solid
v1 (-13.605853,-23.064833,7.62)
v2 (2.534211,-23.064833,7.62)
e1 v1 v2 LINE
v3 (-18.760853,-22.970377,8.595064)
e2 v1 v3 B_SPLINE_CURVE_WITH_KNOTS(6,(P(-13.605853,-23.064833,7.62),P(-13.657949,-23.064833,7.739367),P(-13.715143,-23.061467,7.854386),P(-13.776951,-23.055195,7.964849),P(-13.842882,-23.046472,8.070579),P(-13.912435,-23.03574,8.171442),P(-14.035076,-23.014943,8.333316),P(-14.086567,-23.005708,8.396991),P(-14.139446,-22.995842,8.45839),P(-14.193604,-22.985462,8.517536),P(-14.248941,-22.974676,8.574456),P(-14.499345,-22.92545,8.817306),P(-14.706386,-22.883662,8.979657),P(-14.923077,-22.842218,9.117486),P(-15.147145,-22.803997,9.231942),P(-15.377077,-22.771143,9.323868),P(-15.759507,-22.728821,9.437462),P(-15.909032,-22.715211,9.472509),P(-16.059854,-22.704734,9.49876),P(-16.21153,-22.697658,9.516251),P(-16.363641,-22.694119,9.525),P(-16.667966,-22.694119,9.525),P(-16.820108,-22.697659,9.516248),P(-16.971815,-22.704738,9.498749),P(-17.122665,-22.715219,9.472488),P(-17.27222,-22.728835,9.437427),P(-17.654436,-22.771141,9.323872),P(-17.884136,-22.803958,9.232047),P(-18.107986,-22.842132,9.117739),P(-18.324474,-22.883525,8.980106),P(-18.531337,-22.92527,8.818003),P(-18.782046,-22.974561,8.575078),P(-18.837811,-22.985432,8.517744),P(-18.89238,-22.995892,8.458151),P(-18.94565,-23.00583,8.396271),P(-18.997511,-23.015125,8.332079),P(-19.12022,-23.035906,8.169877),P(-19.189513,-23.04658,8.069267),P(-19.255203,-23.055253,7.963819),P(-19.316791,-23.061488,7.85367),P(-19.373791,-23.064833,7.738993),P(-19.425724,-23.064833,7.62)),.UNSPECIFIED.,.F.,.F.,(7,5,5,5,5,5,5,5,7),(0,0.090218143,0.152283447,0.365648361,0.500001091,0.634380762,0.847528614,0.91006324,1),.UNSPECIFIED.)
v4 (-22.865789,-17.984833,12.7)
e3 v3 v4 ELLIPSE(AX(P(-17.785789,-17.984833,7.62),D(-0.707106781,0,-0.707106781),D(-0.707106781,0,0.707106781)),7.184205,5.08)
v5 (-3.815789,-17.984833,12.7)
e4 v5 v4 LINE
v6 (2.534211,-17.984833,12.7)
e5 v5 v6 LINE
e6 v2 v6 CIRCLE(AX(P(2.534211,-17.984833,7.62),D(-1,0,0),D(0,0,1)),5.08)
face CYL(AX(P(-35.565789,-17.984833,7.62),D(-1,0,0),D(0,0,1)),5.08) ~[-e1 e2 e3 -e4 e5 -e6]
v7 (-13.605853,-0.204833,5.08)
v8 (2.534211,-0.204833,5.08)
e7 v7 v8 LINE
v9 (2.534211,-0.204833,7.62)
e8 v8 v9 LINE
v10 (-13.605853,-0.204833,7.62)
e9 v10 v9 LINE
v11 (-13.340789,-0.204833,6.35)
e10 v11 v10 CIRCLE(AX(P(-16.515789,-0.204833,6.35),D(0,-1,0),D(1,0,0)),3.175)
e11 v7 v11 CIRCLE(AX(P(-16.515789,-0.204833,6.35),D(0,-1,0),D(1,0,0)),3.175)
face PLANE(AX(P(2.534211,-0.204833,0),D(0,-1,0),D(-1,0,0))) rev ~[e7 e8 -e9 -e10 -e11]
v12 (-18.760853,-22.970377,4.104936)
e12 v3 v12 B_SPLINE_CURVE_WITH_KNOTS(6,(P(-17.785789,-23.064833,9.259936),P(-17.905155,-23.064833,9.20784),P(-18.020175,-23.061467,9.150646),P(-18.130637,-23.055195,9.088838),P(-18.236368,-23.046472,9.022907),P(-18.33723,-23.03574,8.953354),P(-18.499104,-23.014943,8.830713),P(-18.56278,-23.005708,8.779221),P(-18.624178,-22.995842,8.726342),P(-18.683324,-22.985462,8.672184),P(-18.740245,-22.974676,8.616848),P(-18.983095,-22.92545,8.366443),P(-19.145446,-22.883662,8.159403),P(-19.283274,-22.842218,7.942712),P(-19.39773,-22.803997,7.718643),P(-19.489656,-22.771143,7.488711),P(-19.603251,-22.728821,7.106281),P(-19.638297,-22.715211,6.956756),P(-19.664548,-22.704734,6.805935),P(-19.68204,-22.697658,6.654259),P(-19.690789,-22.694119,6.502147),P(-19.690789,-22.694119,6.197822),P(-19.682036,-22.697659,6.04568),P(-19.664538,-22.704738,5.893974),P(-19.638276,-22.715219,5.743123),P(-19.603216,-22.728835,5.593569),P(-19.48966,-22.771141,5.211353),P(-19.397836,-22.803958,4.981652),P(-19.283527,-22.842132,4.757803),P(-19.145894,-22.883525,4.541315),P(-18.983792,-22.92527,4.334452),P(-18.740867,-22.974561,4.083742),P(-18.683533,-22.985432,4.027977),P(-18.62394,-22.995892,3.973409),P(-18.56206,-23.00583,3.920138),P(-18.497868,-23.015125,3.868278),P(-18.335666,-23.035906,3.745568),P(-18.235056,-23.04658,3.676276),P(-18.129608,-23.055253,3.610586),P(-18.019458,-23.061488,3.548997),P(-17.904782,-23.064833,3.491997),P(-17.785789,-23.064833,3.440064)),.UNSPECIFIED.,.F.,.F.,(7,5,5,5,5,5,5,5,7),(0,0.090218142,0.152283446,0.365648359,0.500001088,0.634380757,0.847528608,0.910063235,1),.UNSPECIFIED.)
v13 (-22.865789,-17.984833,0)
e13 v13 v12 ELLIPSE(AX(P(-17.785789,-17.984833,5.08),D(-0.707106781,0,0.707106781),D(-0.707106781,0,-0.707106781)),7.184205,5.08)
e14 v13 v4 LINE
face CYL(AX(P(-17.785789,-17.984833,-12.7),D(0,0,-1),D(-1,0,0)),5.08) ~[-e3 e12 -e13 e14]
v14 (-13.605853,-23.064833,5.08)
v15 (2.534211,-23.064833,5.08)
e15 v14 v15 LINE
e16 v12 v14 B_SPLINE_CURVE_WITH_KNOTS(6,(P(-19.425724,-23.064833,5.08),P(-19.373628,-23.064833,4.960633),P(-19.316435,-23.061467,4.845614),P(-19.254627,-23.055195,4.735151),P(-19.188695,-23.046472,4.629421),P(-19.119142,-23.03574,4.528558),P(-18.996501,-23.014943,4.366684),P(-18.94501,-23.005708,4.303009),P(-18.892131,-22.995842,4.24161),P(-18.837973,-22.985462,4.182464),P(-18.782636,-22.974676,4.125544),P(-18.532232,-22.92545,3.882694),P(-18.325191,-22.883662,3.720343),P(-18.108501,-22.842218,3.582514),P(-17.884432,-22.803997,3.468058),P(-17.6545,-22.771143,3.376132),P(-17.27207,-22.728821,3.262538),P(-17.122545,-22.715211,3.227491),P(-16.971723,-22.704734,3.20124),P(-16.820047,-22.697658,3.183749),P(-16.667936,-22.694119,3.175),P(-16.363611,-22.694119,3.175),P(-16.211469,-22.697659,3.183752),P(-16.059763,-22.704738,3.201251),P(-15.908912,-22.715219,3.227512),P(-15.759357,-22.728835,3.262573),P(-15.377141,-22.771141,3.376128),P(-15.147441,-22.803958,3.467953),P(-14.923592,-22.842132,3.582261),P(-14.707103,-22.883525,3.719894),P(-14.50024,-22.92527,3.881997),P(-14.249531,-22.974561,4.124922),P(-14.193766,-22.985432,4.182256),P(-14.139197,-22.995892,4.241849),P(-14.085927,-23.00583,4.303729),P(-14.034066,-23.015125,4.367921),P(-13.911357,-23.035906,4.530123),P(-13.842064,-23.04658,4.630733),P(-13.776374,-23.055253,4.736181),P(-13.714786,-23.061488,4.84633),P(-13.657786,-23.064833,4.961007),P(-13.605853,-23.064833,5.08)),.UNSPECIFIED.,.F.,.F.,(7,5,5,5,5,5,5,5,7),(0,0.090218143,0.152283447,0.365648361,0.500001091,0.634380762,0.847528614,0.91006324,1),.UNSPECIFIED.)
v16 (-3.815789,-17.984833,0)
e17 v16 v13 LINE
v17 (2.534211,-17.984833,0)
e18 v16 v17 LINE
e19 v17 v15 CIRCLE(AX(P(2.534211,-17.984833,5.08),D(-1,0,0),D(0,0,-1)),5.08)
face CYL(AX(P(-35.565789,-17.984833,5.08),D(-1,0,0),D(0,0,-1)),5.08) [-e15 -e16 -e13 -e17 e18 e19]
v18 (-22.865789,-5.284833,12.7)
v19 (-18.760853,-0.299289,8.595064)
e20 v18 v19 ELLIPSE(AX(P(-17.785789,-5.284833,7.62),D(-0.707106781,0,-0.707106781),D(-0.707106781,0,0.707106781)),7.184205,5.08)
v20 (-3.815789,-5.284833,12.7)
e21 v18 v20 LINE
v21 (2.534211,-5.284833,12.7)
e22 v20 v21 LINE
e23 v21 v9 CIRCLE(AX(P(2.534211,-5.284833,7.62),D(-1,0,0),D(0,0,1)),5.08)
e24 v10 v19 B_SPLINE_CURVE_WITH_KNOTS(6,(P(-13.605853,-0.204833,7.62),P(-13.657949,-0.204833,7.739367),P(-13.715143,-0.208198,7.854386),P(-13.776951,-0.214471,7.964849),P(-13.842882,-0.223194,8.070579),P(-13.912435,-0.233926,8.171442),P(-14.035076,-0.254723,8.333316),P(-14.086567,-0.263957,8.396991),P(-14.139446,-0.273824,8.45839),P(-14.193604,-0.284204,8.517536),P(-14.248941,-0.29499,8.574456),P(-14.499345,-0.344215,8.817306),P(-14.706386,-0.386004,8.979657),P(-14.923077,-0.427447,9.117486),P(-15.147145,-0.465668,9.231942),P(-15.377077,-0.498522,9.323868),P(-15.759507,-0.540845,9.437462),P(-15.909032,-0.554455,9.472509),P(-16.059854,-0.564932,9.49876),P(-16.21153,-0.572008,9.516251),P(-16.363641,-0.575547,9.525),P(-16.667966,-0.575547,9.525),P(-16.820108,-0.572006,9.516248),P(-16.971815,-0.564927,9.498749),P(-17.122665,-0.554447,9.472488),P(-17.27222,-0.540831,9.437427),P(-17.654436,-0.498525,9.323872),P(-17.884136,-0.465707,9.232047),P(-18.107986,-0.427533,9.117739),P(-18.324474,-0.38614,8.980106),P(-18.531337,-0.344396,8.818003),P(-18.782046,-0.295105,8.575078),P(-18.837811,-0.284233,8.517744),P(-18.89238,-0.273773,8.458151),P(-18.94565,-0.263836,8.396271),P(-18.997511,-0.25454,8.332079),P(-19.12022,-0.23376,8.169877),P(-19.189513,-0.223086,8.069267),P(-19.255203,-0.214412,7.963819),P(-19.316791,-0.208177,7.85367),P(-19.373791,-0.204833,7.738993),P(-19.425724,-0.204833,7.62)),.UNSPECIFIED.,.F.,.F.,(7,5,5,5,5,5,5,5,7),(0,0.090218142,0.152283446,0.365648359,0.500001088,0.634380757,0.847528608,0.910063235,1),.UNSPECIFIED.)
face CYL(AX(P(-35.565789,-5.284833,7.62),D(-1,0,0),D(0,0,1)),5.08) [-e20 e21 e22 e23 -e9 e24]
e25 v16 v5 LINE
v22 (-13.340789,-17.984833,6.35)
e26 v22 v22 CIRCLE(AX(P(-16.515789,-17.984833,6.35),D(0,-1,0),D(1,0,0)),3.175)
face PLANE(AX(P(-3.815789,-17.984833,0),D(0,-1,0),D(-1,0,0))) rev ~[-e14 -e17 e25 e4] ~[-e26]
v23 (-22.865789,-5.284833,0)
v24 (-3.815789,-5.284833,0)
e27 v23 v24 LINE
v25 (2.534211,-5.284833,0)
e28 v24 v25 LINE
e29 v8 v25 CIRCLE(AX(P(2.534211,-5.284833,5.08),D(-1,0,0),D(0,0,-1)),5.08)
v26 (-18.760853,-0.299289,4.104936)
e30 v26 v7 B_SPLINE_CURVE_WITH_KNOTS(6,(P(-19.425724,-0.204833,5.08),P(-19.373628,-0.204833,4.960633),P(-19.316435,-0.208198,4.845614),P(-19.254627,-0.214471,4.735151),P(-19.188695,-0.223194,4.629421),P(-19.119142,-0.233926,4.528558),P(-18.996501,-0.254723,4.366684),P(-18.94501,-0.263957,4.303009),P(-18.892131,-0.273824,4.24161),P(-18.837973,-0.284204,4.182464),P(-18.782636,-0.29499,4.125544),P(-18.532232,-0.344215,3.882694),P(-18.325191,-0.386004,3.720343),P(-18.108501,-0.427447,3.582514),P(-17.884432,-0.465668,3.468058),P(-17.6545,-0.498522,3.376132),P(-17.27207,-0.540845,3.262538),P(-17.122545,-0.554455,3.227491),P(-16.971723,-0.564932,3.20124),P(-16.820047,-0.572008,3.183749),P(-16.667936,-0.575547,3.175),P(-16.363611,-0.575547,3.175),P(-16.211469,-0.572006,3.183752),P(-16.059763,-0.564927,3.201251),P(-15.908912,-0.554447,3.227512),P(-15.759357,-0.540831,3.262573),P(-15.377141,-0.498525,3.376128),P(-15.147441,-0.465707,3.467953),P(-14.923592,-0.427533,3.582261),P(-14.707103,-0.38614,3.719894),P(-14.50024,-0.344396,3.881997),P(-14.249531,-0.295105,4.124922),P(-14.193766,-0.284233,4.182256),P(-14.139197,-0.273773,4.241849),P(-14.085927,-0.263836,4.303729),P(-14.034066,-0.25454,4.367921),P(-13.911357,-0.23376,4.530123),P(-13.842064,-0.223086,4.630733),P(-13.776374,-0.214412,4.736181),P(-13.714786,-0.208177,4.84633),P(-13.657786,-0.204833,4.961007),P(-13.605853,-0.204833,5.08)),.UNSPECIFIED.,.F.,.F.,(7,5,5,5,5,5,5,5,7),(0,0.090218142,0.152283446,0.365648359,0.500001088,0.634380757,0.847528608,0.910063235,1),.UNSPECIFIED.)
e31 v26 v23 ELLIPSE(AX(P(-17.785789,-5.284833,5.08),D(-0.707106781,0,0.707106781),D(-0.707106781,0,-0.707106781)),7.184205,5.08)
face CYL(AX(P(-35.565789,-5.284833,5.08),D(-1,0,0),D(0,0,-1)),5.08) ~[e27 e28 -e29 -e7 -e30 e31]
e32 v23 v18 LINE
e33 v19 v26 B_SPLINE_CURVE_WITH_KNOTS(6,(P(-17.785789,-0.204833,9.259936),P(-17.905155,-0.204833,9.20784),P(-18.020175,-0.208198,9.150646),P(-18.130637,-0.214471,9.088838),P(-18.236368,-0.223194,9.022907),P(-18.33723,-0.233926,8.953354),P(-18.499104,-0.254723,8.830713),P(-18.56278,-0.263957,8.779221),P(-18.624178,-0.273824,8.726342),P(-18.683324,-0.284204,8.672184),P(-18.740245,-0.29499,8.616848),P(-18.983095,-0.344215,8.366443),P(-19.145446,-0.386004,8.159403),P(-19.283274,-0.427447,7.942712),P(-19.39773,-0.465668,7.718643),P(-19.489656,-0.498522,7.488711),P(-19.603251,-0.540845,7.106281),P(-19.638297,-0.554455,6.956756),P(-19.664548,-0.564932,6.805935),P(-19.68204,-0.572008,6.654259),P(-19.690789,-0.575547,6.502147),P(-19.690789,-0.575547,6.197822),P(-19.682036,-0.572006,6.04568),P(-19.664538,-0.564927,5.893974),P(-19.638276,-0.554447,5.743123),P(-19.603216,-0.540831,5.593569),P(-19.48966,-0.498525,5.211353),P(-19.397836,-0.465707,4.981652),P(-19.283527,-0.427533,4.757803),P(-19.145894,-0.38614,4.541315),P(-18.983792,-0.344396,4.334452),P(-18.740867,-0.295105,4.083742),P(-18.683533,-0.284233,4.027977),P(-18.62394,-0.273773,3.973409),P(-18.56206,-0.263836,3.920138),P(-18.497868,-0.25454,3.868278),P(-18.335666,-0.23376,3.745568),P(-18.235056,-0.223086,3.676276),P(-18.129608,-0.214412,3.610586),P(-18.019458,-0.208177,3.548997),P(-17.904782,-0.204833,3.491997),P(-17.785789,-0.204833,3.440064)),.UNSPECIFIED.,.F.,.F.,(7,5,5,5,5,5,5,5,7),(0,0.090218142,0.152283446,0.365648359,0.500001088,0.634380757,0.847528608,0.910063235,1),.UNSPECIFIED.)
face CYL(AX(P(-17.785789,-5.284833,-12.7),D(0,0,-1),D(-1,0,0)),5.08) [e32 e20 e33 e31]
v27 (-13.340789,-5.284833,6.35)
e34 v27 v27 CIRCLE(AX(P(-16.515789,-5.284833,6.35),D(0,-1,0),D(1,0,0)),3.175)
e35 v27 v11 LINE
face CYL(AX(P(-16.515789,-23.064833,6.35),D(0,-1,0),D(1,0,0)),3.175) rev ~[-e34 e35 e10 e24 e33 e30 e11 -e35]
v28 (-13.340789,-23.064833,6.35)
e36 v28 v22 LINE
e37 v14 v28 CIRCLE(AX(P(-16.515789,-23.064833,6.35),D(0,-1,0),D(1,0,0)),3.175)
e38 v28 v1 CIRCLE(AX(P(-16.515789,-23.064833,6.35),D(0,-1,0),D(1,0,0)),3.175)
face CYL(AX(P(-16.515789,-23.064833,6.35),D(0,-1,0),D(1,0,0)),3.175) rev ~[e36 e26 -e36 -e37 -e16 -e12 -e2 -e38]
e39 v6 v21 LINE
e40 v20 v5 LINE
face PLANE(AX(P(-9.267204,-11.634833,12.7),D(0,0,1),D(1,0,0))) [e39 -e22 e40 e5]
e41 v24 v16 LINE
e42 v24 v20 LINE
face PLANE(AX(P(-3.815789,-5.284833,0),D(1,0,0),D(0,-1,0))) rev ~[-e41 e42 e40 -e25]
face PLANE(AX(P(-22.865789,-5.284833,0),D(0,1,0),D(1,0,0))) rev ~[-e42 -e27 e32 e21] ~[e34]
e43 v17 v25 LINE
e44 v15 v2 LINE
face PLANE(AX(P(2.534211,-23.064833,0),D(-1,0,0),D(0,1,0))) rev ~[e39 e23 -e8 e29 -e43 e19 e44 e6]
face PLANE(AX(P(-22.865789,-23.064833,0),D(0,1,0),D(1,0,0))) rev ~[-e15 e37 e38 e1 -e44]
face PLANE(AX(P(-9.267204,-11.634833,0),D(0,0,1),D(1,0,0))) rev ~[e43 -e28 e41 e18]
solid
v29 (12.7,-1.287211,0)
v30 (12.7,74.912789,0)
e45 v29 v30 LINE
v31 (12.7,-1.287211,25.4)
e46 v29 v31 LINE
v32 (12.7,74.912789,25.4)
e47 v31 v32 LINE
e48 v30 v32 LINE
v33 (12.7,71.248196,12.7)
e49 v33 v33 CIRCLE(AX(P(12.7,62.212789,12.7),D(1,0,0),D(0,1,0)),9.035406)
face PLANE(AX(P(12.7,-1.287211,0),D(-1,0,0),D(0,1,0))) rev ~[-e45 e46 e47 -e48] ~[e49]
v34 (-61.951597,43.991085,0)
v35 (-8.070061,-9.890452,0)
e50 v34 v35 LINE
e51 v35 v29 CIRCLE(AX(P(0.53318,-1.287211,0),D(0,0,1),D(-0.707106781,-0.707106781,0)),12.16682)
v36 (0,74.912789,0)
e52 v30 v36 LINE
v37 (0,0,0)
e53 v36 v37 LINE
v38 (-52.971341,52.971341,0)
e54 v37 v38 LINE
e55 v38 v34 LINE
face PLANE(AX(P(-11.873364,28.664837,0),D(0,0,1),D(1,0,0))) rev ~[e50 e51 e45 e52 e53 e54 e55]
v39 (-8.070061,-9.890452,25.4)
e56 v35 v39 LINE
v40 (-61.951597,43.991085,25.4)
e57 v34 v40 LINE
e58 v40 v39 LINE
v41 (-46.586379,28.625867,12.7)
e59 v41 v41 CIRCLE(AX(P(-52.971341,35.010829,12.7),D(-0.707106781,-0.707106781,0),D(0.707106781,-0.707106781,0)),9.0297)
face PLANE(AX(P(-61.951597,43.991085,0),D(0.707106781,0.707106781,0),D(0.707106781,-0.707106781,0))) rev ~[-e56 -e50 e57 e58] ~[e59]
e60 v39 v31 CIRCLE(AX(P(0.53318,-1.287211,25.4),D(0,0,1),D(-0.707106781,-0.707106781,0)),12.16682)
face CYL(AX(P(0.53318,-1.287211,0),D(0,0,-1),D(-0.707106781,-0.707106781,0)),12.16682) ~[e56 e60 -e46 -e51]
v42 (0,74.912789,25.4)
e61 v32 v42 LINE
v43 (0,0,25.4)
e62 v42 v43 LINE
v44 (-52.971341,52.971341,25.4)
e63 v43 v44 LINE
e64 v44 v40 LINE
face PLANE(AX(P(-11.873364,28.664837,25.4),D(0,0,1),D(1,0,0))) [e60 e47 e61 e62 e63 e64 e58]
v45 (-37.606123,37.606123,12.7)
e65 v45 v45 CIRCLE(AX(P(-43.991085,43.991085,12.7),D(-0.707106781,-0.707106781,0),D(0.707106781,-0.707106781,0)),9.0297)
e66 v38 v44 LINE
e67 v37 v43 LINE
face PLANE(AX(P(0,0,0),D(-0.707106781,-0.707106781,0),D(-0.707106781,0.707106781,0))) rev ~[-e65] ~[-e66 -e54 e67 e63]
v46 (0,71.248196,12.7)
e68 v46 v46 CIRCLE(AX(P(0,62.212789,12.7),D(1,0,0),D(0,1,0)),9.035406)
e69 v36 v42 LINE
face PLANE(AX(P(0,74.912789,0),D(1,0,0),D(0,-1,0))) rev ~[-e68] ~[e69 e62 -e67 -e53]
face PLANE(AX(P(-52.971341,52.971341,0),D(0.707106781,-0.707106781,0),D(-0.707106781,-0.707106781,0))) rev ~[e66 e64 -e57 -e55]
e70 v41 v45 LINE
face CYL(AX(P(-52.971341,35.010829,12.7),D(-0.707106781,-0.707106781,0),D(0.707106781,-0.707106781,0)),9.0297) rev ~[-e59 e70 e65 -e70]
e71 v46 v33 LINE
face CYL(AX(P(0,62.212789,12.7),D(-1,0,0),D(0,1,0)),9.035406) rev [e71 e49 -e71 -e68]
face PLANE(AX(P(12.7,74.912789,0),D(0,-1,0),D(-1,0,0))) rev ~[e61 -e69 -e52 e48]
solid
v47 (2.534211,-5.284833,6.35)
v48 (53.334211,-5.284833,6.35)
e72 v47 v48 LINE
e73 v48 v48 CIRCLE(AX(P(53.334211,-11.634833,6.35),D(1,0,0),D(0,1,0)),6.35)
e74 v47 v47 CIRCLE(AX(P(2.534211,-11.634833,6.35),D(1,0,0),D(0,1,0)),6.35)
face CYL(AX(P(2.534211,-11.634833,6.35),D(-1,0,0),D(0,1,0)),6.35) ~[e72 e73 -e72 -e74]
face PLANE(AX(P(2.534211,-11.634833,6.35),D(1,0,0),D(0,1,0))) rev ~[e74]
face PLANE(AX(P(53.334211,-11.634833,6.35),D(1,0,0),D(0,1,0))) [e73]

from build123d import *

# Parameters (mm, degrees)
F1_DEPTH     = 25.4
F2_R         = 9.0354062308
F3_DEPTH     = 12.7
F4_R         = 9.0297
F5_DEPTH     = 12.7
F7_DEPTH     = 12.7
F8_R         = 3.175
F9_DEPTH     = 97.9786220541
F10_R        = 6.35
F11_DEPTH    = 50.8
F12_T1_DEPTH = 50.8
F12_T3_DEPTH = 38.1


# Not quite as in the source:
# - a fillet or chamfer that OpenCascade refuses, or shapes differently, is made with other operations: its cross-section is extruded or revolved along the edge and cut away or added


with BuildPart() as f1:
    # F0 (on Top) → F1 (new body)
    with BuildSketch(Plane.XY):
        with BuildLine():
            Line((12.7, 74.9127892945), (0, 74.9127892945))
            Line((0, 74.9127892945), (0, 0))
            Line((0, 0), (-52.9713413077, 52.9713413077))
            Line((-52.9713413077, 52.9713413077), (-61.9515974288, 43.9910851867))
            Line((-61.9515974288, 43.9910851867), (-8.0700607024, -9.8904515398))
            ThreePointArc((-8.0700607024, -9.8904515398), (5.18922052, -12.5278865574), (12.7, -1.2872107055))
            Line((12.7, -1.2872107055), (12.7, 74.9127892945))
        make_face()
    extrude(amount=F1_DEPTH)

    # F2 (on Right) → F3 (cut, through all)
    with BuildSketch(Plane.YZ):
        with Locations((62.2127892945, 12.7)):
            Circle(F2_R)
    extrude(amount=F3_DEPTH, mode=Mode.SUBTRACT)

    # F4 (on face) → F5 (cut, through all)
    with BuildSketch(Plane(origin=(-8.9802561211, -8.9802561211, 0), x_dir=(0.7071067812, -0.7071067812, 0), z_dir=(-0.7071067812, -0.7071067812, 0))):
        with Locations((-62.2127892945, 12.7)):
            Circle(F4_R)
    extrude(amount=-F5_DEPTH, mode=Mode.SUBTRACT)


with BuildPart() as f7:
    # F6 (on Top) → F7 (new body)
    with BuildSketch(Plane.XY):
        Polygon((-3.8157885445, -17.9848327596), (-22.8657885445, -17.9848327596), (-22.8657885445, -23.0648327596), (2.5342114555, -23.0648327596), (2.5342114555, -0.2048327596), (-22.8657885445, -0.2048327596), (-22.8657885445, -5.2848327596), (-3.8157885445, -5.2848327596), align=None)
    extrude(amount=F7_DEPTH)

    # F8 (on face) → F9 (cut, through all)
    with BuildSketch(Plane.XZ.offset(23.0648327596)):
        with Locations((-16.5157885445, 6.35)):
            Circle(F8_R)
    extrude(amount=-F9_DEPTH, mode=Mode.SUBTRACT)

    # F12: fillet of radius 5.08 on 6 edges, made by hand

    # F12_s2 → F12_t1 (cut)
    with BuildSketch(Plane.YZ.offset(-35.5657885445)):
        with BuildLine():
            ThreePointArc((-17.9848327596, 12.7), (-21.576935208, 11.2121024484), (-23.0648327596, 7.62))
            Line((-23.0648327596, 7.62), (-23.0648327596, 12.7))
            Line((-23.0648327596, 12.7), (-17.9848327596, 12.7))
        make_face()
        with BuildLine():
            ThreePointArc((-17.9848327596, 0), (-21.576935208, 1.4878975516), (-23.0648327596, 5.08))
            Line((-23.0648327596, 5.08), (-23.0648327596, 0))
            Line((-23.0648327596, 0), (-17.9848327596, 0))
        make_face()
        with BuildLine():
            ThreePointArc((-5.2848327596, 0), (-1.6927303112, 1.4878975516), (-0.2048327596, 5.08))
            Line((-0.2048327596, 5.08), (-0.2048327596, 0))
            Line((-0.2048327596, 0), (-5.2848327596, 0))
        make_face()
        with BuildLine():
            ThreePointArc((-5.2848327596, 12.7), (-1.6927303112, 11.2121024484), (-0.2048327596, 7.62))
            Line((-0.2048327596, 7.62), (-0.2048327596, 12.7))
            Line((-0.2048327596, 12.7), (-5.2848327596, 12.7))
        make_face()
    extrude(amount=F12_T1_DEPTH, mode=Mode.SUBTRACT)

    # F12_s4 → F12_t3 (cut)
    with BuildSketch(Plane.XY.offset(-12.7)):
        with BuildLine():
            ThreePointArc((-22.8657885445, -17.9848327596), (-21.3778909929, -21.576935208), (-17.7857885445, -23.0648327596))
            Line((-17.7857885445, -23.0648327596), (-22.8657885445, -23.0648327596))
            Line((-22.8657885445, -23.0648327596), (-22.8657885445, -17.9848327596))
        make_face()
        with BuildLine():
            ThreePointArc((-22.8657885445, -5.2848327596), (-21.3778909929, -1.6927303112), (-17.7857885445, -0.2048327596))
            Line((-17.7857885445, -0.2048327596), (-22.8657885445, -0.2048327596))
            Line((-22.8657885445, -0.2048327596), (-22.8657885445, -5.2848327596))
        make_face()
    extrude(amount=F12_T3_DEPTH, mode=Mode.SUBTRACT)


with BuildPart() as f11:
    # F10 (on face) → F11 (new body)
    with BuildSketch(Plane.YZ.offset(2.5342114555)):
        with Locations((-11.6348327596, 6.35)):
            Circle(F10_R)
    extrude(amount=F11_DEPTH)


solid = Compound([f1.part, f7.part, f11.part])
